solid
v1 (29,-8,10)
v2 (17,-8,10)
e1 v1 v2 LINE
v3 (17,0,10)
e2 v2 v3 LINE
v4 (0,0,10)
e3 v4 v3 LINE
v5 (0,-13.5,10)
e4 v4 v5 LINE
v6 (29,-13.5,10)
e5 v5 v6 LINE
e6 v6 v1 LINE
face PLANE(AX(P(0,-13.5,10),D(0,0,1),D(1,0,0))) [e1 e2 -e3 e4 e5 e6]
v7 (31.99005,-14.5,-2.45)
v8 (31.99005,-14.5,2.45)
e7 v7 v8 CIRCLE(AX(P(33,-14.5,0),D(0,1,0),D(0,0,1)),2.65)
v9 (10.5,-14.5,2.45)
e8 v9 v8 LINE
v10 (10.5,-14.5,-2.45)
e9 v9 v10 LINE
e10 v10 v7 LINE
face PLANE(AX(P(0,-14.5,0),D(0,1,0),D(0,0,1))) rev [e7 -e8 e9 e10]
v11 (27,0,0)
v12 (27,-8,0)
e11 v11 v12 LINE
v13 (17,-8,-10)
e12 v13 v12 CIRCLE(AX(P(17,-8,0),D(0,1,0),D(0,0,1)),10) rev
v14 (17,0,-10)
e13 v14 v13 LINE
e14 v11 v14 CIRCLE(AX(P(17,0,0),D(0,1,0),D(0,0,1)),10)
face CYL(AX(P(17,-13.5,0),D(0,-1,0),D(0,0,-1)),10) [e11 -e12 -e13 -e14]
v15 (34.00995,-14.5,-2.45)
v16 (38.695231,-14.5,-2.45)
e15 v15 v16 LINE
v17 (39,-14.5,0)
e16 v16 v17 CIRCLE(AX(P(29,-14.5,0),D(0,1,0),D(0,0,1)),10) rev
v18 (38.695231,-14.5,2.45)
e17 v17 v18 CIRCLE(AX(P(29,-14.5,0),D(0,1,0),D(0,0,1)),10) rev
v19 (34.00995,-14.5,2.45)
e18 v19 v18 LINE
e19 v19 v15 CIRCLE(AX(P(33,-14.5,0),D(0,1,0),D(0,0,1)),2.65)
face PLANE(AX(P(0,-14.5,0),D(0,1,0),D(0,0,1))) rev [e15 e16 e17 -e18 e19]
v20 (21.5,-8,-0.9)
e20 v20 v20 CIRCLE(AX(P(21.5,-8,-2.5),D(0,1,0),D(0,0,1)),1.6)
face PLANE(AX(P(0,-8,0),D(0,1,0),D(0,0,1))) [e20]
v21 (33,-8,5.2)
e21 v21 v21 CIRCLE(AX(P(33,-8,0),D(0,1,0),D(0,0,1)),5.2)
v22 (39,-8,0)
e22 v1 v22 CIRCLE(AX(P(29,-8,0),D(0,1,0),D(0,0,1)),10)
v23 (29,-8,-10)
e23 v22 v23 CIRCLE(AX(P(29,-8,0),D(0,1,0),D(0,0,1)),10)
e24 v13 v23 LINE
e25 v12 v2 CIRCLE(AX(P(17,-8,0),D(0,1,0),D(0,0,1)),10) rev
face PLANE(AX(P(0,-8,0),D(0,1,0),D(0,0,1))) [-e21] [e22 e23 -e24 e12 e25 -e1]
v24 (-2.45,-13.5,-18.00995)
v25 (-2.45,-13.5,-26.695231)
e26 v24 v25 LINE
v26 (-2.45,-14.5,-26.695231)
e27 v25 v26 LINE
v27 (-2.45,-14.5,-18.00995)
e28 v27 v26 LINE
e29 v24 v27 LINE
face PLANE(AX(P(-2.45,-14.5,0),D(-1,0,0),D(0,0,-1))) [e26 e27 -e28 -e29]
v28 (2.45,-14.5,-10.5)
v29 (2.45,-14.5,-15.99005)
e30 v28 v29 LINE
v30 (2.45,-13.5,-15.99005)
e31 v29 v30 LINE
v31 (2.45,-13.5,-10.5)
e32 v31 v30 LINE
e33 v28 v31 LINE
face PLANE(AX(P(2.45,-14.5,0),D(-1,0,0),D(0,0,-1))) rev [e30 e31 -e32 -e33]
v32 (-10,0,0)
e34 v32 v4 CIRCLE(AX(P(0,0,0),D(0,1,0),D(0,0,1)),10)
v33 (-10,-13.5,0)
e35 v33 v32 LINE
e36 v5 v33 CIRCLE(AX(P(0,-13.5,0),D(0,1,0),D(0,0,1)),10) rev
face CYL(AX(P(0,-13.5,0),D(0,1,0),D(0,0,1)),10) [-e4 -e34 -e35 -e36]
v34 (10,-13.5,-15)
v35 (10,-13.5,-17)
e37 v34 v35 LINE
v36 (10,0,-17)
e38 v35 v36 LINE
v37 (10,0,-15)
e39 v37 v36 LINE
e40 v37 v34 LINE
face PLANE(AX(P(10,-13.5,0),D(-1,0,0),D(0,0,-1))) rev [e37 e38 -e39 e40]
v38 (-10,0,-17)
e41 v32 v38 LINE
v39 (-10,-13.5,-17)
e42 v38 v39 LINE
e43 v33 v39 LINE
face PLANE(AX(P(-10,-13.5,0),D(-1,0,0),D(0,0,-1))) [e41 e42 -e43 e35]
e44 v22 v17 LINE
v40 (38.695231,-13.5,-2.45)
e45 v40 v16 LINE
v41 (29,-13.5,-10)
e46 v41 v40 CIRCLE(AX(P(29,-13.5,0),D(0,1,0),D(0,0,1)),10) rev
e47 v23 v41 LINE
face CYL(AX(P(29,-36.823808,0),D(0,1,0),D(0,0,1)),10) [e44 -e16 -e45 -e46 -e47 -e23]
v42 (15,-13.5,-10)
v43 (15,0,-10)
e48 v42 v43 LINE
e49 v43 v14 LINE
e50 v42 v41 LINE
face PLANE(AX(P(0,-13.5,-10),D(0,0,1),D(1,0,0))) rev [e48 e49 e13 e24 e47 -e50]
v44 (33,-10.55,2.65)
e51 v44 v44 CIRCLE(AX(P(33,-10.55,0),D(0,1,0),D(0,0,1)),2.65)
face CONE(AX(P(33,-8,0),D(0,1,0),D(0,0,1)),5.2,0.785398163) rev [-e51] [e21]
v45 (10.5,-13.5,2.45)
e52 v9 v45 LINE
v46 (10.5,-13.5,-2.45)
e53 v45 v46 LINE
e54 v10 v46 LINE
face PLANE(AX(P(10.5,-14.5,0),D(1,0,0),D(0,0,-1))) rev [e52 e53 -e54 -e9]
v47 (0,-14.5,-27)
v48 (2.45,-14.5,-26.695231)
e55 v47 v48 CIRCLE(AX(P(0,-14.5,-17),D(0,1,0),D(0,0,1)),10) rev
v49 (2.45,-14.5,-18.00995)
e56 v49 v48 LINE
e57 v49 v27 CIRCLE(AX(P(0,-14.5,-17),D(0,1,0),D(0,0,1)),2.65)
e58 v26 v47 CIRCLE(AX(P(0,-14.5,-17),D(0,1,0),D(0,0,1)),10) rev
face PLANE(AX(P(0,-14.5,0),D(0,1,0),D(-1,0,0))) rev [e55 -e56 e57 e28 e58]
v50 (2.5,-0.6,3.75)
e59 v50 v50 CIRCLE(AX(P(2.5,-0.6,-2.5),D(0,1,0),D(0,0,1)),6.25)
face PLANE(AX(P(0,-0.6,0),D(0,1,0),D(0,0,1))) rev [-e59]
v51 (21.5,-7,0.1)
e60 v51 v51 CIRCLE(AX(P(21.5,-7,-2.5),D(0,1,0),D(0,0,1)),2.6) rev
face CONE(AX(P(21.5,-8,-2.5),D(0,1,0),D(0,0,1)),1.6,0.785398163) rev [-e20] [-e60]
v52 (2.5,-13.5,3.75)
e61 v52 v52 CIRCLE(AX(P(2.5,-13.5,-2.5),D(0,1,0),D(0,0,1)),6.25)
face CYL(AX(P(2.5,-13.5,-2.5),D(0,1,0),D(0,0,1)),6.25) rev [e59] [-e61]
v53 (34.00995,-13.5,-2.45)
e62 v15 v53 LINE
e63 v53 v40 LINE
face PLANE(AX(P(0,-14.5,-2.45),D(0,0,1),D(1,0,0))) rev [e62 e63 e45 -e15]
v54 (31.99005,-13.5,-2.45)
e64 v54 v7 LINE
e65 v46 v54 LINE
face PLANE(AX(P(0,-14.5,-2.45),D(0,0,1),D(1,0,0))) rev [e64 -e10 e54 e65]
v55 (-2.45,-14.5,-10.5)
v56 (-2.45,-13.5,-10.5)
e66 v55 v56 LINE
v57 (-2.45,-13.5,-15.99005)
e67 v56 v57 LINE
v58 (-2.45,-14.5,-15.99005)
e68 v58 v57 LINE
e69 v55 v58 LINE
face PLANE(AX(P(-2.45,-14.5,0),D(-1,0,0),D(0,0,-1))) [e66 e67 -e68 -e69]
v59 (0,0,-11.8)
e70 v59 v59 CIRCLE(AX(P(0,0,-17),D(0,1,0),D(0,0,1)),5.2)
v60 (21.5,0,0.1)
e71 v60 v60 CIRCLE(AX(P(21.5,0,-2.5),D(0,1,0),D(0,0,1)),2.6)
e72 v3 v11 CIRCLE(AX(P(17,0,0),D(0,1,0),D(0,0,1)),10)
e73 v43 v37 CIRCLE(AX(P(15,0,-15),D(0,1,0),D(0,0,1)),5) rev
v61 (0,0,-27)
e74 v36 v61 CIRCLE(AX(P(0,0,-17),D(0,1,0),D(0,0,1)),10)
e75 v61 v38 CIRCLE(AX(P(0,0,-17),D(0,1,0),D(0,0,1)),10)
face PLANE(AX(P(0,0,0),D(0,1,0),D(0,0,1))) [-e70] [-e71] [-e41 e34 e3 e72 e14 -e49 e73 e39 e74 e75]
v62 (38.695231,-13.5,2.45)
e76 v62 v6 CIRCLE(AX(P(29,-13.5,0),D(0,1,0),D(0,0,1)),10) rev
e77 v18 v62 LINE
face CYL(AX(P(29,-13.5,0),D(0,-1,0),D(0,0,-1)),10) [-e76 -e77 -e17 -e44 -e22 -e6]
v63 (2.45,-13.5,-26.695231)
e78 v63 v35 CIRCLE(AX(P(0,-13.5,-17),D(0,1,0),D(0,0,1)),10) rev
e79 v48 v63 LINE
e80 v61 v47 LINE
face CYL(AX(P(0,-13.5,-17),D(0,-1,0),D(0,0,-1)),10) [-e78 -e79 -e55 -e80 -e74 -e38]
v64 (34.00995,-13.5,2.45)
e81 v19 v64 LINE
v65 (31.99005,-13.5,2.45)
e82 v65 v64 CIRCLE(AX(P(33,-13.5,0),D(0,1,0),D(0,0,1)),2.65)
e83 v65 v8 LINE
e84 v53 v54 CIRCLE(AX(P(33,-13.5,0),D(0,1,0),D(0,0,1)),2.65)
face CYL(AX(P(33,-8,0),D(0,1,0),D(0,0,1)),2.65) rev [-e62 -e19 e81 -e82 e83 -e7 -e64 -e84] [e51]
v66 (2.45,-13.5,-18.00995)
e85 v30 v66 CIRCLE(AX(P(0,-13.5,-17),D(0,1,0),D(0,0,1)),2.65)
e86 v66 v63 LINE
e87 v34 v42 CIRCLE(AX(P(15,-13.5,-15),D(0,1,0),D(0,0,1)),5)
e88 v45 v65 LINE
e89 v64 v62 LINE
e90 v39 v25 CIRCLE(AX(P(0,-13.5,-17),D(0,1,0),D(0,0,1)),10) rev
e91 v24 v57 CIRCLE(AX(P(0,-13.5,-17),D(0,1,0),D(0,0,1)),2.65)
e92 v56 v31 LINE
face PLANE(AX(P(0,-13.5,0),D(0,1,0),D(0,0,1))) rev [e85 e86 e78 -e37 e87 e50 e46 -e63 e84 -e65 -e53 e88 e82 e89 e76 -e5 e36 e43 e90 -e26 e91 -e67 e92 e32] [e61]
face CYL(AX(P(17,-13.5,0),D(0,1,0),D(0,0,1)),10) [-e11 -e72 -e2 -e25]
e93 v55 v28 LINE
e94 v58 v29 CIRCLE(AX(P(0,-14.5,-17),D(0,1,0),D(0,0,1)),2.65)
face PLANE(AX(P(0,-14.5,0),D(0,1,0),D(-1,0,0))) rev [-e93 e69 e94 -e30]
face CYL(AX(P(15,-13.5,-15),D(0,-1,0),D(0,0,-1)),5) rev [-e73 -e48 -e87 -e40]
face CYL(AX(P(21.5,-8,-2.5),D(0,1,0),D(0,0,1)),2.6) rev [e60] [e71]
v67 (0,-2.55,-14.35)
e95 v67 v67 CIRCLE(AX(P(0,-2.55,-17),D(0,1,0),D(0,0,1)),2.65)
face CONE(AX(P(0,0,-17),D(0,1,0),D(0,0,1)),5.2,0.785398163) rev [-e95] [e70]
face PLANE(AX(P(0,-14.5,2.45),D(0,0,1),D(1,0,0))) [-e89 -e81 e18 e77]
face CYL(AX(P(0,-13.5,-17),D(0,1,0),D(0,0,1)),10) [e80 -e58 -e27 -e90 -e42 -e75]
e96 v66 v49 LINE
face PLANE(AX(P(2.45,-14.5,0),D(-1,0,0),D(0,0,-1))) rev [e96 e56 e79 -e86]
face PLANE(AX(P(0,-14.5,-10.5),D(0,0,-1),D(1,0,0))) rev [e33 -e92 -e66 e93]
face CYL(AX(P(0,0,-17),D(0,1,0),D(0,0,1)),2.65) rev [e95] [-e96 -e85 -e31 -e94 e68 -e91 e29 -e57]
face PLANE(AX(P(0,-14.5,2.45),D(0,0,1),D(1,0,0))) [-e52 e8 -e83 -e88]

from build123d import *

# Parameters (mm, degrees)
BOSS_EXTRUDE1_DEPTH                             = 13.5
BOSS_EXTRUDE2_START                             = -13.5
SKETCH1_3_W                                     = 16.5
SKETCH1_3_H                                     = 4.9
BOSS_EXTRUDE2_DEPTH                             = 1
BOSS_EXTRUDE3_DEPTH                             = 0.6
CSK_FOR_M5_FLAT_HEAD_MACHINE_SCREW1_D           = 5.3
CSK_FOR_M5_FLAT_HEAD_MACHINE_SCREW1_CSINK_D     = 10.4
CSK_FOR_M5_FLAT_HEAD_MACHINE_SCREW1_CSINK_ANGLE = 90
BOSS_EXTRUDE4_START                             = -8
SKETCH1_5_W                                     = 12
SKETCH1_5_H                                     = 7.55
SKETCH1_5_H_2                                   = 4.9
BOSS_EXTRUDE4_DEPTH                             = 5.5
BOSS_EXTRUDE5_START                             = -13.5
SKETCH1_6_W                                     = 12
SKETCH1_6_H                                     = 4.9
BOSS_EXTRUDE5_DEPTH                             = 1
CSK_FOR_M5_FLAT_HEAD_MACHINE_SCREW2_D           = 5.3
CSK_FOR_M5_FLAT_HEAD_MACHINE_SCREW2_CSINK_D     = 10.4
CSK_FOR_M5_FLAT_HEAD_MACHINE_SCREW2_CSINK_ANGLE = 90
FILLET1_R                                       = 10
FILLET2_R                                       = 5
CUT_EXTRUDE1_DEPTH                              = 8
CHAMFER1_SIZE                                   = 1


with BuildPart() as part:
    # Sketch1 → Boss-Extrude1 (new body)
    with BuildSketch(Plane(origin=(0, 0, 0), x_dir=(1, 0, 0), z_dir=(0, 1, 0))):
        with BuildLine():
            Line((-1.919417382, -1.919417382), (-10, -10))
            Line((-10, -10), (27, -10))
            Line((27, -10), (27, -2.45))
            Line((27, -2.45), (10.5, -2.45))
            Line((10.5, -2.45), (10.5, 2.45))
            Line((10.5, 2.45), (18.900480814, 2.45))
            ThreePointArc((18.900480814, 2.45), (21.474998844, 5.099879794), (24.1, 2.5))
            ThreePointArc((24.1, 2.5), (24.099879794, 2.474998844), (24.099519186, 2.45))
            Line((24.099519186, 2.45), (27, 2.45))
            Line((27, 2.45), (27, 10))
            Line((27, 10), (10, 10))
            Line((10, 10), (6.919417382, 6.919417382))
            ThreePointArc((6.919417382, 6.919417382), (8.274247078, 4.891771452), (8.75, 2.5))
            ThreePointArc((8.75, 2.5), (4.891771452, -3.274247078), (-1.919417382, -1.919417382))
        make_face()
        with BuildLine():
            Line((10.5, -2.45), (27, -2.45))
            Line((27, -2.45), (27, 2.45))
            Line((27, 2.45), (24.099519186, 2.45))
            ThreePointArc((24.099519186, 2.45), (21.5, -0.1), (18.900480814, 2.45))
            Line((18.900480814, 2.45), (10.5, 2.45))
            Line((10.5, 2.45), (10.5, -2.45))
        make_face()
        with BuildLine():
            ThreePointArc((18.900480814, 2.45), (21.5, -0.1), (24.099519186, 2.45))
            Line((24.099519186, 2.45), (18.900480814, 2.45))
        make_face()
        with BuildLine():
            Line((18.900480814, 2.45), (24.099519186, 2.45))
            ThreePointArc((24.099519186, 2.45), (24.099879794, 2.474998844), (24.1, 2.5))
            ThreePointArc((24.1, 2.5), (21.474998844, 5.099879794), (18.900480814, 2.45))
        make_face()
    extrude(amount=-BOSS_EXTRUDE1_DEPTH)

    # Sketch1<3> → Boss-Extrude2 (add)
    with BuildSketch(Plane(origin=(0, 0, 0), x_dir=(1, 0, 0), z_dir=(0, 1, 0)).offset(BOSS_EXTRUDE2_START)):
        with Locations((18.75, 0)):
            Rectangle(SKETCH1_3_W, SKETCH1_3_H)
    extrude(amount=-BOSS_EXTRUDE2_DEPTH)

    # Sketch1<4> → Boss-Extrude3 (add)
    with BuildSketch(Plane(origin=(0, 0, 0), x_dir=(1, 0, 0), z_dir=(0, 1, 0))):
        with BuildLine():
            Line((6.919417382, 6.919417382), (-1.919417382, -1.919417382))
            ThreePointArc((-1.919417382, -1.919417382), (4.891771452, -3.274247078), (8.75, 2.5))
            ThreePointArc((8.75, 2.5), (8.274247078, 4.891771452), (6.919417382, 6.919417382))
        make_face()
    extrude(amount=-BOSS_EXTRUDE3_DEPTH)

    # Mirror1: part across plane


with BuildPart() as part_1:
    add(part.part)
    add(part.part.mirror(Plane(origin=(0, -13.5, 0), x_dir=(-0.7071067811865465, 0, 0.7071067811865486), z_dir=(0.7071067811865488, 0, 0.7071067811865464))))

    # CSK for M5 Flat Head Machine Screw1 (through all)
    with Locations(Plane(origin=(0, 0, 0), x_dir=(1, 0, 0), z_dir=(0, 1, 0))):
        with Locations((0, 17)):
            CounterSinkHole(CSK_FOR_M5_FLAT_HEAD_MACHINE_SCREW1_D / 2, CSK_FOR_M5_FLAT_HEAD_MACHINE_SCREW1_CSINK_D / 2, counter_sink_angle=CSK_FOR_M5_FLAT_HEAD_MACHINE_SCREW1_CSINK_ANGLE)

    # Sketch1<5> → Boss-Extrude4 (add)
    with BuildSketch(Plane(origin=(0, 0, 0), x_dir=(1, 0, 0), z_dir=(0, 1, 0)).offset(BOSS_EXTRUDE4_START)):
        with Locations((33, 6.225)):
            Rectangle(SKETCH1_5_W, SKETCH1_5_H)
        with Locations((33, 0)):
            Rectangle(SKETCH1_5_W, SKETCH1_5_H_2)
        with Locations((33, -6.225)):
            Rectangle(SKETCH1_5_W, SKETCH1_5_H)
    extrude(amount=-BOSS_EXTRUDE4_DEPTH)

    # Sketch1<6> → Boss-Extrude5 (add)
    with BuildSketch(Plane(origin=(0, 0, 0), x_dir=(1, 0, 0), z_dir=(0, 1, 0)).offset(BOSS_EXTRUDE5_START)):
        with Locations((33, 0)):
            Rectangle(SKETCH1_6_W, SKETCH1_6_H)
    extrude(amount=-BOSS_EXTRUDE5_DEPTH)

    # CSK for M5 Flat Head Machine Screw2 (through all)
    with Locations(Plane(origin=(0, -8, 0), x_dir=(1, 0, 0), z_dir=(0, 1, 0))):
        with Locations((33, 0)):
            CounterSinkHole(CSK_FOR_M5_FLAT_HEAD_MACHINE_SCREW2_D / 2, CSK_FOR_M5_FLAT_HEAD_MACHINE_SCREW2_CSINK_D / 2, counter_sink_angle=CSK_FOR_M5_FLAT_HEAD_MACHINE_SCREW2_CSINK_ANGLE)

    # Fillet1
    fillet1_edges = [part_1.edges().sort_by_distance(p)[0] for p in [
        (-10, -6.75, -27),
        (10, -6.75, -27),
        (39, -10.75, -10),
        (39, -10.75, 10),
        (27, -4, -10),
        (27, -4, 10),
        (-10, -6.75, 10),
    ]]
    fillet(fillet1_edges, radius=FILLET1_R - 0.0001)  # a hair under: the kernel refuses the full size

    # Fillet2
    fillet2_edges = [part_1.edges().sort_by_distance(p)[0] for p in [
        (10, -6.75, -10),
    ]]
    fillet(fillet2_edges, radius=FILLET2_R)

    # Sketch1<8> → Cut-Extrude1 (cut)
    with BuildSketch(Plane(origin=(0, 0, 0), x_dir=(1, 0, 0), z_dir=(0, 1, 0))):
        with BuildLine():
            ThreePointArc((18.900480814, 2.45), (21.5, -0.1), (24.099519186, 2.45))
            Line((24.099519186, 2.45), (18.900480814, 2.45))
        make_face()
        with BuildLine():
            Line((18.900480814, 2.45), (24.099519186, 2.45))
            ThreePointArc((24.099519186, 2.45), (24.099879794, 2.474998844), (24.1, 2.5))
            ThreePointArc((24.1, 2.5), (21.474998844, 5.099879794), (18.900480814, 2.45))
        make_face()
    extrude(amount=-CUT_EXTRUDE1_DEPTH, mode=Mode.SUBTRACT)

    # Chamfer1
    chamfer1_edges = [part_1.edges().sort_by_distance(p)[0] for p in [
        (24.099519186, -8, -2.55),
    ]]
    chamfer(chamfer1_edges, length=CHAMFER1_SIZE)


solid = part_1.part
